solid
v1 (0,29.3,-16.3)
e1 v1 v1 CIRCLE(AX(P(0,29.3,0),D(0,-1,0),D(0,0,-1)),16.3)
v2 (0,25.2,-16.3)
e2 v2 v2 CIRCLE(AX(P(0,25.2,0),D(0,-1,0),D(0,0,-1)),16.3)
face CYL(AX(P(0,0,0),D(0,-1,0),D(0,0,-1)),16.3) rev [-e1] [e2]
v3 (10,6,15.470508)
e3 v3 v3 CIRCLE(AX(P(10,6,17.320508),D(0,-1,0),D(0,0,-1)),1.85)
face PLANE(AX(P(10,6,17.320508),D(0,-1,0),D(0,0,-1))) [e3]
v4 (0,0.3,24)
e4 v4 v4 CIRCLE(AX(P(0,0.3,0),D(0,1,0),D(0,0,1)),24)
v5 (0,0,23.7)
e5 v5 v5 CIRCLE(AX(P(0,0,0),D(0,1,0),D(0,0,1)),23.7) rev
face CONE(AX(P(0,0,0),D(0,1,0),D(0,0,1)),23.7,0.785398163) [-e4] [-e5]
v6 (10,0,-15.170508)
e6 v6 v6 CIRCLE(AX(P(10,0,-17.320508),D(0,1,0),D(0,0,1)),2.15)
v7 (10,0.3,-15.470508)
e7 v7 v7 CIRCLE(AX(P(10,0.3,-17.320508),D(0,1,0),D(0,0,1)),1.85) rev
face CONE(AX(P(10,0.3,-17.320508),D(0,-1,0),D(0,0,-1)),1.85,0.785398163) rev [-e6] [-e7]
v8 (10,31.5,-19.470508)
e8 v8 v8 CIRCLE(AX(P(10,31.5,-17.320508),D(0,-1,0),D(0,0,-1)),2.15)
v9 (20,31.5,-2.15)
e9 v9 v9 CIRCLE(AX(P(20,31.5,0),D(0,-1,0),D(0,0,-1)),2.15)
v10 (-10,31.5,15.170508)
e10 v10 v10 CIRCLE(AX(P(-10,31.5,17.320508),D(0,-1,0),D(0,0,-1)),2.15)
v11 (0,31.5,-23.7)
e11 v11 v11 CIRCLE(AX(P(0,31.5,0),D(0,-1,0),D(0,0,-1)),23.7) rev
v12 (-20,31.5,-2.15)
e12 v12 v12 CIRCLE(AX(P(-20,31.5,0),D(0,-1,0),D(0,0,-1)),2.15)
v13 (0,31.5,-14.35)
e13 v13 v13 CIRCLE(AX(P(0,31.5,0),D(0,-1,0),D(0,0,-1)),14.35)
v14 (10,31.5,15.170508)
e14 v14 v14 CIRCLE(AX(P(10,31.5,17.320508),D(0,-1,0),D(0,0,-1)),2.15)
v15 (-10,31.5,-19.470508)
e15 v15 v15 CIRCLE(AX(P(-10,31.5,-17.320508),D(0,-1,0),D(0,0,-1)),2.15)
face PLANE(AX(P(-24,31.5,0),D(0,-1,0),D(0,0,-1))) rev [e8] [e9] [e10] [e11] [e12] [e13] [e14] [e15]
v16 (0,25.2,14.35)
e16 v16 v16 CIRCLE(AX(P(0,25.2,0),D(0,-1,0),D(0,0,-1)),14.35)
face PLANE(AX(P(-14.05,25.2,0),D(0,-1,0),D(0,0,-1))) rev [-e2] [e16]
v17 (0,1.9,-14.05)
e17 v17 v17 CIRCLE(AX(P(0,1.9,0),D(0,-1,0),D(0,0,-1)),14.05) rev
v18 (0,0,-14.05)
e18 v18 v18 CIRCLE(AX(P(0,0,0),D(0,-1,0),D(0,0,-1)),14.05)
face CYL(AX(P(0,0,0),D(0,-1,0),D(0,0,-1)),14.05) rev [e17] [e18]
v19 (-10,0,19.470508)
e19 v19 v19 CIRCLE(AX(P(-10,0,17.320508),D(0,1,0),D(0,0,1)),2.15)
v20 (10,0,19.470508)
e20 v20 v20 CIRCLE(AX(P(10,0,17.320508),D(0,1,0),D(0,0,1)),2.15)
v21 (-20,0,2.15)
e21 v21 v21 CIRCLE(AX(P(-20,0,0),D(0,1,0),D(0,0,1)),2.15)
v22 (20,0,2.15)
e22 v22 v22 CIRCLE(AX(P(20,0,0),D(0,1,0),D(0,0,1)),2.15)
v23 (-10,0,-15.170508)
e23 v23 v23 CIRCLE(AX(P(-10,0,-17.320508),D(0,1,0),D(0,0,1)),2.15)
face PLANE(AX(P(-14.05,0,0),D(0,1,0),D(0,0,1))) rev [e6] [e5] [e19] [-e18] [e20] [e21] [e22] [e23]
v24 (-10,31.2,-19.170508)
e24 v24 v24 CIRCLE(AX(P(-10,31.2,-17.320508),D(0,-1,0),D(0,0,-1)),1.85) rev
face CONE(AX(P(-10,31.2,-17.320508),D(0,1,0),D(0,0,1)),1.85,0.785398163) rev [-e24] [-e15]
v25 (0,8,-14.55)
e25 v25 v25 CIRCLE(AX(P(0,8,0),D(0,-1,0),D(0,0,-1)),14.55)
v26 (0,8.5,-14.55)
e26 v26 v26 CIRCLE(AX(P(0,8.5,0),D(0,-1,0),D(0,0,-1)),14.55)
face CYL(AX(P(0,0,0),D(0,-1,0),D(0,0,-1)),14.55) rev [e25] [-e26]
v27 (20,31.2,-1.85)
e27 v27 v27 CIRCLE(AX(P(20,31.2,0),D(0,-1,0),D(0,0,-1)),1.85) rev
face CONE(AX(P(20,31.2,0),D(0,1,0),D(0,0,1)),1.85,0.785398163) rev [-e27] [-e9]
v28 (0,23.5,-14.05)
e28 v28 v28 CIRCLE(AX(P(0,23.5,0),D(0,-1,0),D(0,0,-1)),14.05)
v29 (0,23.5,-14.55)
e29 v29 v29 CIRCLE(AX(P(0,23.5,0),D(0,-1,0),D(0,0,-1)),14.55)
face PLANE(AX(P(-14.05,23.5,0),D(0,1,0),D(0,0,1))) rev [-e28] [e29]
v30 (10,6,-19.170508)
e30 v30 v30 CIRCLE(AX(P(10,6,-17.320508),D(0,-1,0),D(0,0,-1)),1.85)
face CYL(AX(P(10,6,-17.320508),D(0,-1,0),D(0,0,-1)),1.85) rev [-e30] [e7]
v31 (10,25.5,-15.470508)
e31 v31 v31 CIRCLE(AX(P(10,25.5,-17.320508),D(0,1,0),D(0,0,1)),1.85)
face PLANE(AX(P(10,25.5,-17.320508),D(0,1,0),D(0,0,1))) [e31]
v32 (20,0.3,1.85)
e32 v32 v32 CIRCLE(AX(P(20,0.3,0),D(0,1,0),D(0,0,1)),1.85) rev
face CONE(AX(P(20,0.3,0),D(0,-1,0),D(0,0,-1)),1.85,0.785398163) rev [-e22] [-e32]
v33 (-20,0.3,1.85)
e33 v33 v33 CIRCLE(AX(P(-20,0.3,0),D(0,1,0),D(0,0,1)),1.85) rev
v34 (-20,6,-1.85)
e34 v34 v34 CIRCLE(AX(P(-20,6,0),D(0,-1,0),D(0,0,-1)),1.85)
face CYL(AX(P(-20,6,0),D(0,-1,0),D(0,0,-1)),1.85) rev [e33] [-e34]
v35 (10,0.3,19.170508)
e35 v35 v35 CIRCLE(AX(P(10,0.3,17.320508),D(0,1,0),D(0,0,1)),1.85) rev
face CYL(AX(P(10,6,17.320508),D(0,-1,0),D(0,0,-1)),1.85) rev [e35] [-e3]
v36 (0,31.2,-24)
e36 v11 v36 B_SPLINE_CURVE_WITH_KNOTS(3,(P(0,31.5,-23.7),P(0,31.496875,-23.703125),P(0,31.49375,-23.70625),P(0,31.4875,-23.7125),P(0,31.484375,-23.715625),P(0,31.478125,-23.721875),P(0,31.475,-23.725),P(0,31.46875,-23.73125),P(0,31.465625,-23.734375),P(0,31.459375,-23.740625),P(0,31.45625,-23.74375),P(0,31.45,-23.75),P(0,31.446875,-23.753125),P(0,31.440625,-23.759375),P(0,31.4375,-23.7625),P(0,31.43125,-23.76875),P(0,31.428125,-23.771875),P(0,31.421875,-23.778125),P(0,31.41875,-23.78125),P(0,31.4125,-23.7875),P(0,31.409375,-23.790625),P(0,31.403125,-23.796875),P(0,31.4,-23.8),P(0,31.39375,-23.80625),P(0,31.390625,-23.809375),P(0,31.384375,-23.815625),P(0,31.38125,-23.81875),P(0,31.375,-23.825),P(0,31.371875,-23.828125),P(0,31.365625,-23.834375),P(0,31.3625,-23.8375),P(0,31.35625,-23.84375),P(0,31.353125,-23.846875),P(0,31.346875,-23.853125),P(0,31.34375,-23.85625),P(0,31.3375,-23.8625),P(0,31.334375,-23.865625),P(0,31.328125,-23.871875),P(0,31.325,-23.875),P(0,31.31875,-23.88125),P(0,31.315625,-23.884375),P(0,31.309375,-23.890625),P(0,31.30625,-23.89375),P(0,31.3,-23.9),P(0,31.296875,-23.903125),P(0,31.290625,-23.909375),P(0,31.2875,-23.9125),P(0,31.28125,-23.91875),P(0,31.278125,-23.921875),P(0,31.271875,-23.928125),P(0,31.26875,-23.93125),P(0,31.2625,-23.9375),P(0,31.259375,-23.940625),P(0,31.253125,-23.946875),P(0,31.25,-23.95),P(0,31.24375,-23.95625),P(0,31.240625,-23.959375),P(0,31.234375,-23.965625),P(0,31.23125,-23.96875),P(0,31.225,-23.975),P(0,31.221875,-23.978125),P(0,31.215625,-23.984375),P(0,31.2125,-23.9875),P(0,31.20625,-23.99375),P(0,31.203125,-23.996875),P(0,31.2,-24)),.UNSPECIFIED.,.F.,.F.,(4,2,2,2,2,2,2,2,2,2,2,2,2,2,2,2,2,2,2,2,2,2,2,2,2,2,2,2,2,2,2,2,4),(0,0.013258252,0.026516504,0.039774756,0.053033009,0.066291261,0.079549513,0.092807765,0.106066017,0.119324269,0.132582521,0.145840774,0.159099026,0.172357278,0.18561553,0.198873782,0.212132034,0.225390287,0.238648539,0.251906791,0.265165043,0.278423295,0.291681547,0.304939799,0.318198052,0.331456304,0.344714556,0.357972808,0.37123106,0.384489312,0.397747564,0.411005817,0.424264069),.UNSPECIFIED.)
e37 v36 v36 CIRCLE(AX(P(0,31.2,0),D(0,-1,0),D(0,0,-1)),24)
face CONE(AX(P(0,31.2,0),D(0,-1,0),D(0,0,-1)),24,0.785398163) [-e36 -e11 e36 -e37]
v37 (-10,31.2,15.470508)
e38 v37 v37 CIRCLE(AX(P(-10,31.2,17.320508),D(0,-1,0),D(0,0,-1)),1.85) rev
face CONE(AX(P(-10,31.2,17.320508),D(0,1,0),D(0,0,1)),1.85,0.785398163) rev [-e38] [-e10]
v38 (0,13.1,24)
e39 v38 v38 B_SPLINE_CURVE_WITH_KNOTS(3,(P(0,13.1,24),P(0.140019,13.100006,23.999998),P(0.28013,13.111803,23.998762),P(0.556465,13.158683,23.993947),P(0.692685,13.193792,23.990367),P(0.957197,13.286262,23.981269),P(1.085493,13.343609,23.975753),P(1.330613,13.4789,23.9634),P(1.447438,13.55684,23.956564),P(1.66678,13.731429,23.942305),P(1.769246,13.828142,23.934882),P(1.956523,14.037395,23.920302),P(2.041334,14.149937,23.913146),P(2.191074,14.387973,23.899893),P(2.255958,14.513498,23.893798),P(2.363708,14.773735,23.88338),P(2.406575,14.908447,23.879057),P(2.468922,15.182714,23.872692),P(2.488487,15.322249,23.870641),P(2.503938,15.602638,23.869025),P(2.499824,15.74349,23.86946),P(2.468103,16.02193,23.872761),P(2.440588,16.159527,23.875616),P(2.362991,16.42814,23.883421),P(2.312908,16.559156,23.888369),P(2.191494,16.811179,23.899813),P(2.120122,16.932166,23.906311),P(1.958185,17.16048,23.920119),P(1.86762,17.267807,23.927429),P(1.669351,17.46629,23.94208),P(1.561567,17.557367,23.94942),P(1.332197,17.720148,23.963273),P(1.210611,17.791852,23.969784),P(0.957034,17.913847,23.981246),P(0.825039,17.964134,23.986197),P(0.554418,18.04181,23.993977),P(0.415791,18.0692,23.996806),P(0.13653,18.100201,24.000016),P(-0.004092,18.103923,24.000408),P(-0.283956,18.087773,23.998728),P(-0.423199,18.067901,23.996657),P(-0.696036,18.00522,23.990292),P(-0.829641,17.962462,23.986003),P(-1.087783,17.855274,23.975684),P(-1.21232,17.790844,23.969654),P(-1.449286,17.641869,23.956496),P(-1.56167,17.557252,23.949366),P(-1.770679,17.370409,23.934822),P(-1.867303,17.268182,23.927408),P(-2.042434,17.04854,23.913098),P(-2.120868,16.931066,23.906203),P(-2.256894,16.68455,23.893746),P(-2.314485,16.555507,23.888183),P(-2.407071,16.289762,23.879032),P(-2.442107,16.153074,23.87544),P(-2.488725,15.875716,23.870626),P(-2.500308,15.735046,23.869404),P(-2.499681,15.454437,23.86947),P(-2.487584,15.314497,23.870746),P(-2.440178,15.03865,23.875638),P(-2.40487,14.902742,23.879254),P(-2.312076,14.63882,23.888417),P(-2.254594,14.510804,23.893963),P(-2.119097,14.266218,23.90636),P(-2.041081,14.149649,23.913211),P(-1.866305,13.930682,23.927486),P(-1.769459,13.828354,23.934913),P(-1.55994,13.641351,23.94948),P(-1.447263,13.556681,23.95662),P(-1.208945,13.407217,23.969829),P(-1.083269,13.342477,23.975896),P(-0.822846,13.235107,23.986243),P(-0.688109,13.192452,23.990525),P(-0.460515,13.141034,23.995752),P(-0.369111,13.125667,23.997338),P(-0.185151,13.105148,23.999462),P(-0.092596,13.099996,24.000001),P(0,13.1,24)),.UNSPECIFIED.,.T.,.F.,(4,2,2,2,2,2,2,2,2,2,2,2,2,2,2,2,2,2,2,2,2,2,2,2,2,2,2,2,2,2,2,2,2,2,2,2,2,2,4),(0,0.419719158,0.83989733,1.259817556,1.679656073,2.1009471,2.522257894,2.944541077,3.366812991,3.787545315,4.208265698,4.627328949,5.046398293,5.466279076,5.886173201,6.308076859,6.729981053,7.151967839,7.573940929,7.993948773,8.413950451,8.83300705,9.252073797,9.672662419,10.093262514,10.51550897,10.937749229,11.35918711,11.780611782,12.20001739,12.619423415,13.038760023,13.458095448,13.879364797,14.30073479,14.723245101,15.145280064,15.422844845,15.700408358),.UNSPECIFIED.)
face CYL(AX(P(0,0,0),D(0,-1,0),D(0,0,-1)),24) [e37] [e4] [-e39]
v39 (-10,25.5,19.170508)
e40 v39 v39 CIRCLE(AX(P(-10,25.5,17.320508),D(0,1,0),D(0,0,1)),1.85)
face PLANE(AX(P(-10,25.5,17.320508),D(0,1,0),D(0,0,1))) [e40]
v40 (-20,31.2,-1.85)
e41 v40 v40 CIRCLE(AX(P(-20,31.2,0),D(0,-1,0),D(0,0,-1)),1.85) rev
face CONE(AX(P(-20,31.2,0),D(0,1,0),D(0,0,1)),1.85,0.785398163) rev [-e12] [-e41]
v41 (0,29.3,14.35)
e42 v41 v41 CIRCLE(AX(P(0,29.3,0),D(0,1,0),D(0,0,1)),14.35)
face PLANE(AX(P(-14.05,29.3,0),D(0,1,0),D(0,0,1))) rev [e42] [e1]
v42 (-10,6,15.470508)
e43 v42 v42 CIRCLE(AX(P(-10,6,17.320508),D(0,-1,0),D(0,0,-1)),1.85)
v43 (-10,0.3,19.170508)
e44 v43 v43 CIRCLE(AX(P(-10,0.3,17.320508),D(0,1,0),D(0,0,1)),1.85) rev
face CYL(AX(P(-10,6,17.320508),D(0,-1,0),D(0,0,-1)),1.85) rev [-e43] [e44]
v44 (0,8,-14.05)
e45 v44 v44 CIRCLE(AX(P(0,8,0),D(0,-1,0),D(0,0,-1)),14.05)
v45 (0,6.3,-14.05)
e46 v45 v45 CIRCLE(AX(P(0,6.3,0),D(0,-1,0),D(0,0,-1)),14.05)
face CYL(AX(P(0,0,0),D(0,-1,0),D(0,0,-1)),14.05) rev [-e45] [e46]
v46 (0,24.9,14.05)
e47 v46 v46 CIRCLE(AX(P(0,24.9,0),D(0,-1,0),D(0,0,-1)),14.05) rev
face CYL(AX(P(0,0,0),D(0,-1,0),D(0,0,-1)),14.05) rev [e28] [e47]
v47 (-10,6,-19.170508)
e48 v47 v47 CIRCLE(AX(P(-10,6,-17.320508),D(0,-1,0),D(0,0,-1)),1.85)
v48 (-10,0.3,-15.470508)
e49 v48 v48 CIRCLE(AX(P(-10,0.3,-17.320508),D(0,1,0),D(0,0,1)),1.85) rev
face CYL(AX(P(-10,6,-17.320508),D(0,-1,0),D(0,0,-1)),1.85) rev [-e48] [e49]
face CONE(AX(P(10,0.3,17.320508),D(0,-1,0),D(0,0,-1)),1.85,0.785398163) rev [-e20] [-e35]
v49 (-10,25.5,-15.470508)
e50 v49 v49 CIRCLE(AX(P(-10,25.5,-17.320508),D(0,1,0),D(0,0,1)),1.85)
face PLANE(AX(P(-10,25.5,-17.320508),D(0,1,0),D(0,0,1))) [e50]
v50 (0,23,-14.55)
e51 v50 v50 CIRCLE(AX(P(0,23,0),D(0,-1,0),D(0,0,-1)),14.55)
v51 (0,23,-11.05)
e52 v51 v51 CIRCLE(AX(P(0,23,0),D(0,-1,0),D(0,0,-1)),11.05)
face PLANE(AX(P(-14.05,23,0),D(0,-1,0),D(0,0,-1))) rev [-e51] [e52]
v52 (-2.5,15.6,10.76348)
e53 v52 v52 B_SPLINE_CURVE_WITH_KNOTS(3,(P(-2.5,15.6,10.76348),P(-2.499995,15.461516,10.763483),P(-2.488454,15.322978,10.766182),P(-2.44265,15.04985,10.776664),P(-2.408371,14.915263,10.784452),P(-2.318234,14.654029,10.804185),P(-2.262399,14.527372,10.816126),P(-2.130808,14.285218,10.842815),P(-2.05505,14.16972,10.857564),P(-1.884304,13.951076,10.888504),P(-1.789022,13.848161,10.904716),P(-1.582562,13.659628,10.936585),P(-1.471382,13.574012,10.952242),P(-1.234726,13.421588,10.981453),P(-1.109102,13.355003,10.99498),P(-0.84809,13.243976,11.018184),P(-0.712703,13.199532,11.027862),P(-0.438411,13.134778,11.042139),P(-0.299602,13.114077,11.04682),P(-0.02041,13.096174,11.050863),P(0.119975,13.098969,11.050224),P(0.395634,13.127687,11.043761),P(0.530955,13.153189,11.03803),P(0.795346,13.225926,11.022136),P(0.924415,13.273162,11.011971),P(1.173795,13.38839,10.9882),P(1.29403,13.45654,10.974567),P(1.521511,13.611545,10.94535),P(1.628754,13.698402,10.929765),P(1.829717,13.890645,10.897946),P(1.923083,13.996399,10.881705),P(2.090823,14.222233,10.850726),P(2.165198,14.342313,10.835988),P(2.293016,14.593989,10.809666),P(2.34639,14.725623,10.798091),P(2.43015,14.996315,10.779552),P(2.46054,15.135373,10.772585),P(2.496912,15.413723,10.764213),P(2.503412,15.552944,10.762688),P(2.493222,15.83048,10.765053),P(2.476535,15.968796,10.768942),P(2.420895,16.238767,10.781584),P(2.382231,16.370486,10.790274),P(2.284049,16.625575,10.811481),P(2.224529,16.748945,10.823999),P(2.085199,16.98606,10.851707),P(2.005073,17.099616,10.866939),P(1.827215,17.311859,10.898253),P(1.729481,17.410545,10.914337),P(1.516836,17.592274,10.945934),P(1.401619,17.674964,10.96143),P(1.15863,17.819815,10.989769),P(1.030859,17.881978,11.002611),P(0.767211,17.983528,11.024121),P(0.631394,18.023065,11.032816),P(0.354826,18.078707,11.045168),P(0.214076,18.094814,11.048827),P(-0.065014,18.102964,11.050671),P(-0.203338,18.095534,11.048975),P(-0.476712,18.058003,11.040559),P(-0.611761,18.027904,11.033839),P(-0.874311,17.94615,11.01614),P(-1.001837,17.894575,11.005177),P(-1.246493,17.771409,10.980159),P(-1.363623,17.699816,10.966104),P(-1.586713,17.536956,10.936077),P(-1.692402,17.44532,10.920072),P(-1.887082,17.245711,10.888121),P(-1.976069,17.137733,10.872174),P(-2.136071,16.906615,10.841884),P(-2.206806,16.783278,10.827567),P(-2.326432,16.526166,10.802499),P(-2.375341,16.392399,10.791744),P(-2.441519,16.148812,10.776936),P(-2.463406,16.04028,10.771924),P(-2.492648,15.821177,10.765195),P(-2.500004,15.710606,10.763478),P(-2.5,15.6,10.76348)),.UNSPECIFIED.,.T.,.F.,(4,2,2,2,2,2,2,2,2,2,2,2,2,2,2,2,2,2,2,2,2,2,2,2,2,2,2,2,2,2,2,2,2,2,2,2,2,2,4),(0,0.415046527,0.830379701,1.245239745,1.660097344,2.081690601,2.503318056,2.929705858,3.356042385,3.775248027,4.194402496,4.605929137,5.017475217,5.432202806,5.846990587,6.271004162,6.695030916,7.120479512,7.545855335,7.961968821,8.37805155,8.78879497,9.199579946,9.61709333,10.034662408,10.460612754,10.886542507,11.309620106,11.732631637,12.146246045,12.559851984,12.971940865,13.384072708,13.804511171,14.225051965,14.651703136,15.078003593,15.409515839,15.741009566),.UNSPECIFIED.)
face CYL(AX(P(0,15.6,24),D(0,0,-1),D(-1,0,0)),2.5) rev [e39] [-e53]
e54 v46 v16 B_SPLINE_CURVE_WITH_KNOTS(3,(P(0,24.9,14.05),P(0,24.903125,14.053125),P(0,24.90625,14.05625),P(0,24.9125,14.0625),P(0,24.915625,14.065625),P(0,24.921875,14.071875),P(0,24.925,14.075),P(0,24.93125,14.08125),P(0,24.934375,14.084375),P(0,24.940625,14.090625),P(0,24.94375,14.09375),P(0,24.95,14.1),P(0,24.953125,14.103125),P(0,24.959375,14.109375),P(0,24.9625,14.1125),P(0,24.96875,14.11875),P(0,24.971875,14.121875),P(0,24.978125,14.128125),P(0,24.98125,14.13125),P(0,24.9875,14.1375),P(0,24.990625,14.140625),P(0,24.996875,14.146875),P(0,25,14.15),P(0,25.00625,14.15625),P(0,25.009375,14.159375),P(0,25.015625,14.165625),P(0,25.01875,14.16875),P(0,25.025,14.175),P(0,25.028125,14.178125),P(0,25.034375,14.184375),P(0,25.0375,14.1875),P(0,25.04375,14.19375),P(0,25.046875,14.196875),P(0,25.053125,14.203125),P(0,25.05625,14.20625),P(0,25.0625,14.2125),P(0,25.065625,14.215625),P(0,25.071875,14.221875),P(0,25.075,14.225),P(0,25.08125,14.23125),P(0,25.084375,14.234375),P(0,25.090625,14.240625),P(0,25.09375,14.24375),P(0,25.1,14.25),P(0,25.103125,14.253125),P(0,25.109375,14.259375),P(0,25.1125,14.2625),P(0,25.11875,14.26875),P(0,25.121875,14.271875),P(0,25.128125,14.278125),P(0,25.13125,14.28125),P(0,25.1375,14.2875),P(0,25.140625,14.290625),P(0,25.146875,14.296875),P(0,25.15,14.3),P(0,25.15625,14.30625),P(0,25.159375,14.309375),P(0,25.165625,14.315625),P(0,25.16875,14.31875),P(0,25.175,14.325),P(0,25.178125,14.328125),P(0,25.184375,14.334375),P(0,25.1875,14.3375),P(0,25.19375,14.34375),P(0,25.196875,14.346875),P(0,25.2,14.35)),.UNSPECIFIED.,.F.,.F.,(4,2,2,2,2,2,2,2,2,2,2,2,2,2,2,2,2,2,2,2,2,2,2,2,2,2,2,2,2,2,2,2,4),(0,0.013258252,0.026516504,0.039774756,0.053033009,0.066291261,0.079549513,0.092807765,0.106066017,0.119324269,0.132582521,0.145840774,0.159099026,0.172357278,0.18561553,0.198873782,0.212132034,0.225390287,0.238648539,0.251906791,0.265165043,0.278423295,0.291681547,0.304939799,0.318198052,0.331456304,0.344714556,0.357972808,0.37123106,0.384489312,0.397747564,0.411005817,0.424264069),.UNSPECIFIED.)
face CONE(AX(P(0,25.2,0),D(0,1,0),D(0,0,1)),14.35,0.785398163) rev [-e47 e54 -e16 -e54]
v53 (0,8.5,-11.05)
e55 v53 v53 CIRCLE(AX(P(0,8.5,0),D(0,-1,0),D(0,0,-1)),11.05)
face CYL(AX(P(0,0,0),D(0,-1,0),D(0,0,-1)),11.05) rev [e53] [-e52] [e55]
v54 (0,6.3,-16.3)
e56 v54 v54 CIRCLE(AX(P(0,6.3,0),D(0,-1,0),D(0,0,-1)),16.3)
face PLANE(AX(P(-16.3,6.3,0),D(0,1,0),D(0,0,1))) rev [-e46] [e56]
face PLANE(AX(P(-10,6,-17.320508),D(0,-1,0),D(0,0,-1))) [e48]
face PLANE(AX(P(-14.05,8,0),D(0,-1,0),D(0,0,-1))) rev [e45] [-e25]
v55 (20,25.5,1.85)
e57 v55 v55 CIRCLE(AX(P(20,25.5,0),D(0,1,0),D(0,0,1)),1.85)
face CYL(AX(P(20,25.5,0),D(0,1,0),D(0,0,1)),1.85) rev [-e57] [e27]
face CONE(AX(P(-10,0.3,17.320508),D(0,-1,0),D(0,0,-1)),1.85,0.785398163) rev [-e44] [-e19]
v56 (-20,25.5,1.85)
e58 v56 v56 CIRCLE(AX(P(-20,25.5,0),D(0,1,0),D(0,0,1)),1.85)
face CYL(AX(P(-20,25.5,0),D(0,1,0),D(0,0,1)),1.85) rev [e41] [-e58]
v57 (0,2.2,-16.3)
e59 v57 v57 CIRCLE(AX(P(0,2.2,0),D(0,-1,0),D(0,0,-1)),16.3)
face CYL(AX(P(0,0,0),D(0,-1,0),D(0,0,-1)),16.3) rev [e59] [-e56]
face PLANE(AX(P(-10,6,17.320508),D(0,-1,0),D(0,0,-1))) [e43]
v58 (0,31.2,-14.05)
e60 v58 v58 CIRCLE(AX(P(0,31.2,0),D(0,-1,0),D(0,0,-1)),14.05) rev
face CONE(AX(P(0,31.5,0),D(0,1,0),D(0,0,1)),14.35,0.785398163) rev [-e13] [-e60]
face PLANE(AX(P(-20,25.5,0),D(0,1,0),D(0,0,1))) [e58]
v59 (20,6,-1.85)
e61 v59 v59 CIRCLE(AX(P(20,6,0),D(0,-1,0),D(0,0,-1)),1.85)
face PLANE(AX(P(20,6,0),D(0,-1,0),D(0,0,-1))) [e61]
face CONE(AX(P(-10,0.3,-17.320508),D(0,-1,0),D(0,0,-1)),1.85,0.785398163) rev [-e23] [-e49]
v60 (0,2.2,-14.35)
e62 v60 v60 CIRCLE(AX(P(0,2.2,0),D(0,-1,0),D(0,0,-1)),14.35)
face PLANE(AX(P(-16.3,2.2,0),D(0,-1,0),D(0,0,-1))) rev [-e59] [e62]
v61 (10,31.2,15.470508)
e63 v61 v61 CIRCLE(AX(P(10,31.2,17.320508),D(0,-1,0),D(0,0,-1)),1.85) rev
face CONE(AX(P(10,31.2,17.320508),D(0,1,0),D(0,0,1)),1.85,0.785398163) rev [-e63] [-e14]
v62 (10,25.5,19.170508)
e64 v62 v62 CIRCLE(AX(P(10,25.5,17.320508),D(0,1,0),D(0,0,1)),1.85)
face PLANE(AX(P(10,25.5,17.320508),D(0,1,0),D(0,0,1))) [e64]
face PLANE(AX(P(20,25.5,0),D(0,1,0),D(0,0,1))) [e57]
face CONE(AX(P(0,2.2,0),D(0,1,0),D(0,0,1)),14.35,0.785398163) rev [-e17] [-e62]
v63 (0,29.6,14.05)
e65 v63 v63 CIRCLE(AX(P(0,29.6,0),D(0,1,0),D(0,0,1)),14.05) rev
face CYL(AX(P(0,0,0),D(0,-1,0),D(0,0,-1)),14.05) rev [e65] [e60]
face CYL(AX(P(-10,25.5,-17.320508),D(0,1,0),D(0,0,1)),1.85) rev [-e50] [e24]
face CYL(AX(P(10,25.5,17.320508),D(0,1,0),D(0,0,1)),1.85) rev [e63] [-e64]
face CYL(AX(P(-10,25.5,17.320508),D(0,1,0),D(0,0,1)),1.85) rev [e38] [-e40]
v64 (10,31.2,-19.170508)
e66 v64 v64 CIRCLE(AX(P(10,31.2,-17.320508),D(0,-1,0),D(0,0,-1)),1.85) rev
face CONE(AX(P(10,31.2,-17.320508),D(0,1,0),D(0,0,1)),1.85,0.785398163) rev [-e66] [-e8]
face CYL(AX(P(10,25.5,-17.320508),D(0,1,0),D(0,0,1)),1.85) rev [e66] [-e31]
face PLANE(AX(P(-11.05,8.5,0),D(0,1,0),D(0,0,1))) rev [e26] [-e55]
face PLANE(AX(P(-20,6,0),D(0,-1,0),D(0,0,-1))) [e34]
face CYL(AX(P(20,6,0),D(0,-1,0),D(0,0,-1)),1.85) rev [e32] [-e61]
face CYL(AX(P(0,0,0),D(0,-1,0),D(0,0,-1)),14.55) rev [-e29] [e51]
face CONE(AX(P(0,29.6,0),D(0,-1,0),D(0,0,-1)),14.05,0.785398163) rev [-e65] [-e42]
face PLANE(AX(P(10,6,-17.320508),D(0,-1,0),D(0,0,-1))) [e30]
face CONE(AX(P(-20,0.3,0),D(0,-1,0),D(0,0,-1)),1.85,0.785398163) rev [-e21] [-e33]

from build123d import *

# Parameters (mm, degrees)
SKETCH5_R              = 1.85
CUT_EXTRUDE2_DEPTH     = 6
CUT_EXTRUDE3_START     = -6
SKETCH8_R              = 1.85
CUT_EXTRUDE3_DEPTH     = 6
CHAMFER1_SIZE          = 0.3
CUT_EXTRUDE4_START     = 10.763479818
CUT_EXTRUDE4_OUTLINE_R = 2.5
CUT_EXTRUDE4_DEPTH     = 13.236520282


# Read off the part's stored shape, not the designer's step: Cut-Extrude4
with BuildPart() as part:
    # Sketch1 → Revolve1 (revolve)
    with BuildSketch(Plane.XY, mode=Mode.PRIVATE) as revolve1_sk:
        Polygon((-14.05, 0), (-24, 0), (-24, 31.5), (-14.05, 31.5), (-14.05, 29.3), (-16.3, 29.3), (-16.3, 25.2), (-14.05, 25.2), (-14.05, 23.5), (-14.55, 23.5), (-14.55, 23), (-14.05, 23), (-11.05, 23), (-11.05, 8.5), (-14.05, 8.5), (-14.55, 8.5), (-14.55, 8), (-14.05, 8), (-14.05, 6.3), (-16.3, 6.3), (-16.3, 2.2), (-14.05, 2.2), align=None)
    revolve(revolve1_sk.sketch.rotate(Axis((0, 0, 0), (0, 1, 0)), 270), axis=Axis((0, 0, 0), (0, 1, 0)))

    # Sketch5 → Cut-Extrude2 (cut)
    with BuildSketch(Plane(origin=(0, 31.5, 0), x_dir=(1, 0, 0), z_dir=(0, 1, 0))):
        with Locations(Location((-20, 0, 0), (0, 0, 270))):
            Circle(SKETCH5_R)
        with Locations(Location((-10, 17.320508076, 0), (0, 0, 270))):
            Circle(SKETCH5_R)
        with Locations(Location((10, 17.320508076, 0), (0, 0, 270))):
            Circle(SKETCH5_R)
        with Locations(Location((20, 0, 0), (0, 0, 270))):
            Circle(SKETCH5_R)
        with Locations(Location((10, -17.320508076, 0), (0, 0, 270))):
            Circle(SKETCH5_R)
        with Locations(Location((-10, -17.320508076, 0), (0, 0, 270))):
            Circle(SKETCH5_R)
    extrude(amount=-CUT_EXTRUDE2_DEPTH, mode=Mode.SUBTRACT)

    # Sketch8 → Cut-Extrude3 (cut)
    with BuildSketch(Plane.XZ.offset(CUT_EXTRUDE3_START)):
        with Locations(Location((-20, 0, 0), (0, 0, 90))):
            Circle(SKETCH8_R)
        with Locations(Location((-10, 17.320508076, 0), (0, 0, 90))):
            Circle(SKETCH8_R)
        with Locations(Location((10, 17.320508076, 0), (0, 0, 90))):
            Circle(SKETCH8_R)
        with Locations(Location((20, 0, 0), (0, 0, 90))):
            Circle(SKETCH8_R)
        with Locations(Location((10, -17.320508076, 0), (0, 0, 90))):
            Circle(SKETCH8_R)
        with Locations(Location((-10, -17.320508076, 0), (0, 0, 90))):
            Circle(SKETCH8_R)
    extrude(amount=CUT_EXTRUDE3_DEPTH, mode=Mode.SUBTRACT)

    # Chamfer1
    chamfer1_edges = [part.edges().sort_by_distance(p)[0] for p in [
        (0, 2.2, 14.05),
        (0, 0, 24),
        (0, 31.5, 24),
        (0, 31.5, 14.05),
        (0, 29.3, 14.05),
        (0, 25.2, 14.05),
        (-20, 31.5, -1.85),
        (-10, 31.5, 15.470508076),
        (10, 31.5, 15.470508076),
        (20, 31.5, -1.85),
        (10, 31.5, -19.170508076),
        (-10, 31.5, -19.170508076),
        (-20, 0, -1.85),
        (-10, 0, -19.170508076),
        (10, 0, -19.170508076),
        (20, 0, -1.85),
        (10, 0, 15.470508076),
        (-10, 0, 15.470508076),
    ]]
    chamfer(chamfer1_edges, length=CHAMFER1_SIZE)

    # Cut-Extrude4 outline → Cut-Extrude4 (cut)
    with BuildSketch(Plane.XY.offset(CUT_EXTRUDE4_START)):
        with Locations((0, 15.6)):
            Circle(CUT_EXTRUDE4_OUTLINE_R)
    extrude(amount=CUT_EXTRUDE4_DEPTH, mode=Mode.SUBTRACT)


solid = part.part
